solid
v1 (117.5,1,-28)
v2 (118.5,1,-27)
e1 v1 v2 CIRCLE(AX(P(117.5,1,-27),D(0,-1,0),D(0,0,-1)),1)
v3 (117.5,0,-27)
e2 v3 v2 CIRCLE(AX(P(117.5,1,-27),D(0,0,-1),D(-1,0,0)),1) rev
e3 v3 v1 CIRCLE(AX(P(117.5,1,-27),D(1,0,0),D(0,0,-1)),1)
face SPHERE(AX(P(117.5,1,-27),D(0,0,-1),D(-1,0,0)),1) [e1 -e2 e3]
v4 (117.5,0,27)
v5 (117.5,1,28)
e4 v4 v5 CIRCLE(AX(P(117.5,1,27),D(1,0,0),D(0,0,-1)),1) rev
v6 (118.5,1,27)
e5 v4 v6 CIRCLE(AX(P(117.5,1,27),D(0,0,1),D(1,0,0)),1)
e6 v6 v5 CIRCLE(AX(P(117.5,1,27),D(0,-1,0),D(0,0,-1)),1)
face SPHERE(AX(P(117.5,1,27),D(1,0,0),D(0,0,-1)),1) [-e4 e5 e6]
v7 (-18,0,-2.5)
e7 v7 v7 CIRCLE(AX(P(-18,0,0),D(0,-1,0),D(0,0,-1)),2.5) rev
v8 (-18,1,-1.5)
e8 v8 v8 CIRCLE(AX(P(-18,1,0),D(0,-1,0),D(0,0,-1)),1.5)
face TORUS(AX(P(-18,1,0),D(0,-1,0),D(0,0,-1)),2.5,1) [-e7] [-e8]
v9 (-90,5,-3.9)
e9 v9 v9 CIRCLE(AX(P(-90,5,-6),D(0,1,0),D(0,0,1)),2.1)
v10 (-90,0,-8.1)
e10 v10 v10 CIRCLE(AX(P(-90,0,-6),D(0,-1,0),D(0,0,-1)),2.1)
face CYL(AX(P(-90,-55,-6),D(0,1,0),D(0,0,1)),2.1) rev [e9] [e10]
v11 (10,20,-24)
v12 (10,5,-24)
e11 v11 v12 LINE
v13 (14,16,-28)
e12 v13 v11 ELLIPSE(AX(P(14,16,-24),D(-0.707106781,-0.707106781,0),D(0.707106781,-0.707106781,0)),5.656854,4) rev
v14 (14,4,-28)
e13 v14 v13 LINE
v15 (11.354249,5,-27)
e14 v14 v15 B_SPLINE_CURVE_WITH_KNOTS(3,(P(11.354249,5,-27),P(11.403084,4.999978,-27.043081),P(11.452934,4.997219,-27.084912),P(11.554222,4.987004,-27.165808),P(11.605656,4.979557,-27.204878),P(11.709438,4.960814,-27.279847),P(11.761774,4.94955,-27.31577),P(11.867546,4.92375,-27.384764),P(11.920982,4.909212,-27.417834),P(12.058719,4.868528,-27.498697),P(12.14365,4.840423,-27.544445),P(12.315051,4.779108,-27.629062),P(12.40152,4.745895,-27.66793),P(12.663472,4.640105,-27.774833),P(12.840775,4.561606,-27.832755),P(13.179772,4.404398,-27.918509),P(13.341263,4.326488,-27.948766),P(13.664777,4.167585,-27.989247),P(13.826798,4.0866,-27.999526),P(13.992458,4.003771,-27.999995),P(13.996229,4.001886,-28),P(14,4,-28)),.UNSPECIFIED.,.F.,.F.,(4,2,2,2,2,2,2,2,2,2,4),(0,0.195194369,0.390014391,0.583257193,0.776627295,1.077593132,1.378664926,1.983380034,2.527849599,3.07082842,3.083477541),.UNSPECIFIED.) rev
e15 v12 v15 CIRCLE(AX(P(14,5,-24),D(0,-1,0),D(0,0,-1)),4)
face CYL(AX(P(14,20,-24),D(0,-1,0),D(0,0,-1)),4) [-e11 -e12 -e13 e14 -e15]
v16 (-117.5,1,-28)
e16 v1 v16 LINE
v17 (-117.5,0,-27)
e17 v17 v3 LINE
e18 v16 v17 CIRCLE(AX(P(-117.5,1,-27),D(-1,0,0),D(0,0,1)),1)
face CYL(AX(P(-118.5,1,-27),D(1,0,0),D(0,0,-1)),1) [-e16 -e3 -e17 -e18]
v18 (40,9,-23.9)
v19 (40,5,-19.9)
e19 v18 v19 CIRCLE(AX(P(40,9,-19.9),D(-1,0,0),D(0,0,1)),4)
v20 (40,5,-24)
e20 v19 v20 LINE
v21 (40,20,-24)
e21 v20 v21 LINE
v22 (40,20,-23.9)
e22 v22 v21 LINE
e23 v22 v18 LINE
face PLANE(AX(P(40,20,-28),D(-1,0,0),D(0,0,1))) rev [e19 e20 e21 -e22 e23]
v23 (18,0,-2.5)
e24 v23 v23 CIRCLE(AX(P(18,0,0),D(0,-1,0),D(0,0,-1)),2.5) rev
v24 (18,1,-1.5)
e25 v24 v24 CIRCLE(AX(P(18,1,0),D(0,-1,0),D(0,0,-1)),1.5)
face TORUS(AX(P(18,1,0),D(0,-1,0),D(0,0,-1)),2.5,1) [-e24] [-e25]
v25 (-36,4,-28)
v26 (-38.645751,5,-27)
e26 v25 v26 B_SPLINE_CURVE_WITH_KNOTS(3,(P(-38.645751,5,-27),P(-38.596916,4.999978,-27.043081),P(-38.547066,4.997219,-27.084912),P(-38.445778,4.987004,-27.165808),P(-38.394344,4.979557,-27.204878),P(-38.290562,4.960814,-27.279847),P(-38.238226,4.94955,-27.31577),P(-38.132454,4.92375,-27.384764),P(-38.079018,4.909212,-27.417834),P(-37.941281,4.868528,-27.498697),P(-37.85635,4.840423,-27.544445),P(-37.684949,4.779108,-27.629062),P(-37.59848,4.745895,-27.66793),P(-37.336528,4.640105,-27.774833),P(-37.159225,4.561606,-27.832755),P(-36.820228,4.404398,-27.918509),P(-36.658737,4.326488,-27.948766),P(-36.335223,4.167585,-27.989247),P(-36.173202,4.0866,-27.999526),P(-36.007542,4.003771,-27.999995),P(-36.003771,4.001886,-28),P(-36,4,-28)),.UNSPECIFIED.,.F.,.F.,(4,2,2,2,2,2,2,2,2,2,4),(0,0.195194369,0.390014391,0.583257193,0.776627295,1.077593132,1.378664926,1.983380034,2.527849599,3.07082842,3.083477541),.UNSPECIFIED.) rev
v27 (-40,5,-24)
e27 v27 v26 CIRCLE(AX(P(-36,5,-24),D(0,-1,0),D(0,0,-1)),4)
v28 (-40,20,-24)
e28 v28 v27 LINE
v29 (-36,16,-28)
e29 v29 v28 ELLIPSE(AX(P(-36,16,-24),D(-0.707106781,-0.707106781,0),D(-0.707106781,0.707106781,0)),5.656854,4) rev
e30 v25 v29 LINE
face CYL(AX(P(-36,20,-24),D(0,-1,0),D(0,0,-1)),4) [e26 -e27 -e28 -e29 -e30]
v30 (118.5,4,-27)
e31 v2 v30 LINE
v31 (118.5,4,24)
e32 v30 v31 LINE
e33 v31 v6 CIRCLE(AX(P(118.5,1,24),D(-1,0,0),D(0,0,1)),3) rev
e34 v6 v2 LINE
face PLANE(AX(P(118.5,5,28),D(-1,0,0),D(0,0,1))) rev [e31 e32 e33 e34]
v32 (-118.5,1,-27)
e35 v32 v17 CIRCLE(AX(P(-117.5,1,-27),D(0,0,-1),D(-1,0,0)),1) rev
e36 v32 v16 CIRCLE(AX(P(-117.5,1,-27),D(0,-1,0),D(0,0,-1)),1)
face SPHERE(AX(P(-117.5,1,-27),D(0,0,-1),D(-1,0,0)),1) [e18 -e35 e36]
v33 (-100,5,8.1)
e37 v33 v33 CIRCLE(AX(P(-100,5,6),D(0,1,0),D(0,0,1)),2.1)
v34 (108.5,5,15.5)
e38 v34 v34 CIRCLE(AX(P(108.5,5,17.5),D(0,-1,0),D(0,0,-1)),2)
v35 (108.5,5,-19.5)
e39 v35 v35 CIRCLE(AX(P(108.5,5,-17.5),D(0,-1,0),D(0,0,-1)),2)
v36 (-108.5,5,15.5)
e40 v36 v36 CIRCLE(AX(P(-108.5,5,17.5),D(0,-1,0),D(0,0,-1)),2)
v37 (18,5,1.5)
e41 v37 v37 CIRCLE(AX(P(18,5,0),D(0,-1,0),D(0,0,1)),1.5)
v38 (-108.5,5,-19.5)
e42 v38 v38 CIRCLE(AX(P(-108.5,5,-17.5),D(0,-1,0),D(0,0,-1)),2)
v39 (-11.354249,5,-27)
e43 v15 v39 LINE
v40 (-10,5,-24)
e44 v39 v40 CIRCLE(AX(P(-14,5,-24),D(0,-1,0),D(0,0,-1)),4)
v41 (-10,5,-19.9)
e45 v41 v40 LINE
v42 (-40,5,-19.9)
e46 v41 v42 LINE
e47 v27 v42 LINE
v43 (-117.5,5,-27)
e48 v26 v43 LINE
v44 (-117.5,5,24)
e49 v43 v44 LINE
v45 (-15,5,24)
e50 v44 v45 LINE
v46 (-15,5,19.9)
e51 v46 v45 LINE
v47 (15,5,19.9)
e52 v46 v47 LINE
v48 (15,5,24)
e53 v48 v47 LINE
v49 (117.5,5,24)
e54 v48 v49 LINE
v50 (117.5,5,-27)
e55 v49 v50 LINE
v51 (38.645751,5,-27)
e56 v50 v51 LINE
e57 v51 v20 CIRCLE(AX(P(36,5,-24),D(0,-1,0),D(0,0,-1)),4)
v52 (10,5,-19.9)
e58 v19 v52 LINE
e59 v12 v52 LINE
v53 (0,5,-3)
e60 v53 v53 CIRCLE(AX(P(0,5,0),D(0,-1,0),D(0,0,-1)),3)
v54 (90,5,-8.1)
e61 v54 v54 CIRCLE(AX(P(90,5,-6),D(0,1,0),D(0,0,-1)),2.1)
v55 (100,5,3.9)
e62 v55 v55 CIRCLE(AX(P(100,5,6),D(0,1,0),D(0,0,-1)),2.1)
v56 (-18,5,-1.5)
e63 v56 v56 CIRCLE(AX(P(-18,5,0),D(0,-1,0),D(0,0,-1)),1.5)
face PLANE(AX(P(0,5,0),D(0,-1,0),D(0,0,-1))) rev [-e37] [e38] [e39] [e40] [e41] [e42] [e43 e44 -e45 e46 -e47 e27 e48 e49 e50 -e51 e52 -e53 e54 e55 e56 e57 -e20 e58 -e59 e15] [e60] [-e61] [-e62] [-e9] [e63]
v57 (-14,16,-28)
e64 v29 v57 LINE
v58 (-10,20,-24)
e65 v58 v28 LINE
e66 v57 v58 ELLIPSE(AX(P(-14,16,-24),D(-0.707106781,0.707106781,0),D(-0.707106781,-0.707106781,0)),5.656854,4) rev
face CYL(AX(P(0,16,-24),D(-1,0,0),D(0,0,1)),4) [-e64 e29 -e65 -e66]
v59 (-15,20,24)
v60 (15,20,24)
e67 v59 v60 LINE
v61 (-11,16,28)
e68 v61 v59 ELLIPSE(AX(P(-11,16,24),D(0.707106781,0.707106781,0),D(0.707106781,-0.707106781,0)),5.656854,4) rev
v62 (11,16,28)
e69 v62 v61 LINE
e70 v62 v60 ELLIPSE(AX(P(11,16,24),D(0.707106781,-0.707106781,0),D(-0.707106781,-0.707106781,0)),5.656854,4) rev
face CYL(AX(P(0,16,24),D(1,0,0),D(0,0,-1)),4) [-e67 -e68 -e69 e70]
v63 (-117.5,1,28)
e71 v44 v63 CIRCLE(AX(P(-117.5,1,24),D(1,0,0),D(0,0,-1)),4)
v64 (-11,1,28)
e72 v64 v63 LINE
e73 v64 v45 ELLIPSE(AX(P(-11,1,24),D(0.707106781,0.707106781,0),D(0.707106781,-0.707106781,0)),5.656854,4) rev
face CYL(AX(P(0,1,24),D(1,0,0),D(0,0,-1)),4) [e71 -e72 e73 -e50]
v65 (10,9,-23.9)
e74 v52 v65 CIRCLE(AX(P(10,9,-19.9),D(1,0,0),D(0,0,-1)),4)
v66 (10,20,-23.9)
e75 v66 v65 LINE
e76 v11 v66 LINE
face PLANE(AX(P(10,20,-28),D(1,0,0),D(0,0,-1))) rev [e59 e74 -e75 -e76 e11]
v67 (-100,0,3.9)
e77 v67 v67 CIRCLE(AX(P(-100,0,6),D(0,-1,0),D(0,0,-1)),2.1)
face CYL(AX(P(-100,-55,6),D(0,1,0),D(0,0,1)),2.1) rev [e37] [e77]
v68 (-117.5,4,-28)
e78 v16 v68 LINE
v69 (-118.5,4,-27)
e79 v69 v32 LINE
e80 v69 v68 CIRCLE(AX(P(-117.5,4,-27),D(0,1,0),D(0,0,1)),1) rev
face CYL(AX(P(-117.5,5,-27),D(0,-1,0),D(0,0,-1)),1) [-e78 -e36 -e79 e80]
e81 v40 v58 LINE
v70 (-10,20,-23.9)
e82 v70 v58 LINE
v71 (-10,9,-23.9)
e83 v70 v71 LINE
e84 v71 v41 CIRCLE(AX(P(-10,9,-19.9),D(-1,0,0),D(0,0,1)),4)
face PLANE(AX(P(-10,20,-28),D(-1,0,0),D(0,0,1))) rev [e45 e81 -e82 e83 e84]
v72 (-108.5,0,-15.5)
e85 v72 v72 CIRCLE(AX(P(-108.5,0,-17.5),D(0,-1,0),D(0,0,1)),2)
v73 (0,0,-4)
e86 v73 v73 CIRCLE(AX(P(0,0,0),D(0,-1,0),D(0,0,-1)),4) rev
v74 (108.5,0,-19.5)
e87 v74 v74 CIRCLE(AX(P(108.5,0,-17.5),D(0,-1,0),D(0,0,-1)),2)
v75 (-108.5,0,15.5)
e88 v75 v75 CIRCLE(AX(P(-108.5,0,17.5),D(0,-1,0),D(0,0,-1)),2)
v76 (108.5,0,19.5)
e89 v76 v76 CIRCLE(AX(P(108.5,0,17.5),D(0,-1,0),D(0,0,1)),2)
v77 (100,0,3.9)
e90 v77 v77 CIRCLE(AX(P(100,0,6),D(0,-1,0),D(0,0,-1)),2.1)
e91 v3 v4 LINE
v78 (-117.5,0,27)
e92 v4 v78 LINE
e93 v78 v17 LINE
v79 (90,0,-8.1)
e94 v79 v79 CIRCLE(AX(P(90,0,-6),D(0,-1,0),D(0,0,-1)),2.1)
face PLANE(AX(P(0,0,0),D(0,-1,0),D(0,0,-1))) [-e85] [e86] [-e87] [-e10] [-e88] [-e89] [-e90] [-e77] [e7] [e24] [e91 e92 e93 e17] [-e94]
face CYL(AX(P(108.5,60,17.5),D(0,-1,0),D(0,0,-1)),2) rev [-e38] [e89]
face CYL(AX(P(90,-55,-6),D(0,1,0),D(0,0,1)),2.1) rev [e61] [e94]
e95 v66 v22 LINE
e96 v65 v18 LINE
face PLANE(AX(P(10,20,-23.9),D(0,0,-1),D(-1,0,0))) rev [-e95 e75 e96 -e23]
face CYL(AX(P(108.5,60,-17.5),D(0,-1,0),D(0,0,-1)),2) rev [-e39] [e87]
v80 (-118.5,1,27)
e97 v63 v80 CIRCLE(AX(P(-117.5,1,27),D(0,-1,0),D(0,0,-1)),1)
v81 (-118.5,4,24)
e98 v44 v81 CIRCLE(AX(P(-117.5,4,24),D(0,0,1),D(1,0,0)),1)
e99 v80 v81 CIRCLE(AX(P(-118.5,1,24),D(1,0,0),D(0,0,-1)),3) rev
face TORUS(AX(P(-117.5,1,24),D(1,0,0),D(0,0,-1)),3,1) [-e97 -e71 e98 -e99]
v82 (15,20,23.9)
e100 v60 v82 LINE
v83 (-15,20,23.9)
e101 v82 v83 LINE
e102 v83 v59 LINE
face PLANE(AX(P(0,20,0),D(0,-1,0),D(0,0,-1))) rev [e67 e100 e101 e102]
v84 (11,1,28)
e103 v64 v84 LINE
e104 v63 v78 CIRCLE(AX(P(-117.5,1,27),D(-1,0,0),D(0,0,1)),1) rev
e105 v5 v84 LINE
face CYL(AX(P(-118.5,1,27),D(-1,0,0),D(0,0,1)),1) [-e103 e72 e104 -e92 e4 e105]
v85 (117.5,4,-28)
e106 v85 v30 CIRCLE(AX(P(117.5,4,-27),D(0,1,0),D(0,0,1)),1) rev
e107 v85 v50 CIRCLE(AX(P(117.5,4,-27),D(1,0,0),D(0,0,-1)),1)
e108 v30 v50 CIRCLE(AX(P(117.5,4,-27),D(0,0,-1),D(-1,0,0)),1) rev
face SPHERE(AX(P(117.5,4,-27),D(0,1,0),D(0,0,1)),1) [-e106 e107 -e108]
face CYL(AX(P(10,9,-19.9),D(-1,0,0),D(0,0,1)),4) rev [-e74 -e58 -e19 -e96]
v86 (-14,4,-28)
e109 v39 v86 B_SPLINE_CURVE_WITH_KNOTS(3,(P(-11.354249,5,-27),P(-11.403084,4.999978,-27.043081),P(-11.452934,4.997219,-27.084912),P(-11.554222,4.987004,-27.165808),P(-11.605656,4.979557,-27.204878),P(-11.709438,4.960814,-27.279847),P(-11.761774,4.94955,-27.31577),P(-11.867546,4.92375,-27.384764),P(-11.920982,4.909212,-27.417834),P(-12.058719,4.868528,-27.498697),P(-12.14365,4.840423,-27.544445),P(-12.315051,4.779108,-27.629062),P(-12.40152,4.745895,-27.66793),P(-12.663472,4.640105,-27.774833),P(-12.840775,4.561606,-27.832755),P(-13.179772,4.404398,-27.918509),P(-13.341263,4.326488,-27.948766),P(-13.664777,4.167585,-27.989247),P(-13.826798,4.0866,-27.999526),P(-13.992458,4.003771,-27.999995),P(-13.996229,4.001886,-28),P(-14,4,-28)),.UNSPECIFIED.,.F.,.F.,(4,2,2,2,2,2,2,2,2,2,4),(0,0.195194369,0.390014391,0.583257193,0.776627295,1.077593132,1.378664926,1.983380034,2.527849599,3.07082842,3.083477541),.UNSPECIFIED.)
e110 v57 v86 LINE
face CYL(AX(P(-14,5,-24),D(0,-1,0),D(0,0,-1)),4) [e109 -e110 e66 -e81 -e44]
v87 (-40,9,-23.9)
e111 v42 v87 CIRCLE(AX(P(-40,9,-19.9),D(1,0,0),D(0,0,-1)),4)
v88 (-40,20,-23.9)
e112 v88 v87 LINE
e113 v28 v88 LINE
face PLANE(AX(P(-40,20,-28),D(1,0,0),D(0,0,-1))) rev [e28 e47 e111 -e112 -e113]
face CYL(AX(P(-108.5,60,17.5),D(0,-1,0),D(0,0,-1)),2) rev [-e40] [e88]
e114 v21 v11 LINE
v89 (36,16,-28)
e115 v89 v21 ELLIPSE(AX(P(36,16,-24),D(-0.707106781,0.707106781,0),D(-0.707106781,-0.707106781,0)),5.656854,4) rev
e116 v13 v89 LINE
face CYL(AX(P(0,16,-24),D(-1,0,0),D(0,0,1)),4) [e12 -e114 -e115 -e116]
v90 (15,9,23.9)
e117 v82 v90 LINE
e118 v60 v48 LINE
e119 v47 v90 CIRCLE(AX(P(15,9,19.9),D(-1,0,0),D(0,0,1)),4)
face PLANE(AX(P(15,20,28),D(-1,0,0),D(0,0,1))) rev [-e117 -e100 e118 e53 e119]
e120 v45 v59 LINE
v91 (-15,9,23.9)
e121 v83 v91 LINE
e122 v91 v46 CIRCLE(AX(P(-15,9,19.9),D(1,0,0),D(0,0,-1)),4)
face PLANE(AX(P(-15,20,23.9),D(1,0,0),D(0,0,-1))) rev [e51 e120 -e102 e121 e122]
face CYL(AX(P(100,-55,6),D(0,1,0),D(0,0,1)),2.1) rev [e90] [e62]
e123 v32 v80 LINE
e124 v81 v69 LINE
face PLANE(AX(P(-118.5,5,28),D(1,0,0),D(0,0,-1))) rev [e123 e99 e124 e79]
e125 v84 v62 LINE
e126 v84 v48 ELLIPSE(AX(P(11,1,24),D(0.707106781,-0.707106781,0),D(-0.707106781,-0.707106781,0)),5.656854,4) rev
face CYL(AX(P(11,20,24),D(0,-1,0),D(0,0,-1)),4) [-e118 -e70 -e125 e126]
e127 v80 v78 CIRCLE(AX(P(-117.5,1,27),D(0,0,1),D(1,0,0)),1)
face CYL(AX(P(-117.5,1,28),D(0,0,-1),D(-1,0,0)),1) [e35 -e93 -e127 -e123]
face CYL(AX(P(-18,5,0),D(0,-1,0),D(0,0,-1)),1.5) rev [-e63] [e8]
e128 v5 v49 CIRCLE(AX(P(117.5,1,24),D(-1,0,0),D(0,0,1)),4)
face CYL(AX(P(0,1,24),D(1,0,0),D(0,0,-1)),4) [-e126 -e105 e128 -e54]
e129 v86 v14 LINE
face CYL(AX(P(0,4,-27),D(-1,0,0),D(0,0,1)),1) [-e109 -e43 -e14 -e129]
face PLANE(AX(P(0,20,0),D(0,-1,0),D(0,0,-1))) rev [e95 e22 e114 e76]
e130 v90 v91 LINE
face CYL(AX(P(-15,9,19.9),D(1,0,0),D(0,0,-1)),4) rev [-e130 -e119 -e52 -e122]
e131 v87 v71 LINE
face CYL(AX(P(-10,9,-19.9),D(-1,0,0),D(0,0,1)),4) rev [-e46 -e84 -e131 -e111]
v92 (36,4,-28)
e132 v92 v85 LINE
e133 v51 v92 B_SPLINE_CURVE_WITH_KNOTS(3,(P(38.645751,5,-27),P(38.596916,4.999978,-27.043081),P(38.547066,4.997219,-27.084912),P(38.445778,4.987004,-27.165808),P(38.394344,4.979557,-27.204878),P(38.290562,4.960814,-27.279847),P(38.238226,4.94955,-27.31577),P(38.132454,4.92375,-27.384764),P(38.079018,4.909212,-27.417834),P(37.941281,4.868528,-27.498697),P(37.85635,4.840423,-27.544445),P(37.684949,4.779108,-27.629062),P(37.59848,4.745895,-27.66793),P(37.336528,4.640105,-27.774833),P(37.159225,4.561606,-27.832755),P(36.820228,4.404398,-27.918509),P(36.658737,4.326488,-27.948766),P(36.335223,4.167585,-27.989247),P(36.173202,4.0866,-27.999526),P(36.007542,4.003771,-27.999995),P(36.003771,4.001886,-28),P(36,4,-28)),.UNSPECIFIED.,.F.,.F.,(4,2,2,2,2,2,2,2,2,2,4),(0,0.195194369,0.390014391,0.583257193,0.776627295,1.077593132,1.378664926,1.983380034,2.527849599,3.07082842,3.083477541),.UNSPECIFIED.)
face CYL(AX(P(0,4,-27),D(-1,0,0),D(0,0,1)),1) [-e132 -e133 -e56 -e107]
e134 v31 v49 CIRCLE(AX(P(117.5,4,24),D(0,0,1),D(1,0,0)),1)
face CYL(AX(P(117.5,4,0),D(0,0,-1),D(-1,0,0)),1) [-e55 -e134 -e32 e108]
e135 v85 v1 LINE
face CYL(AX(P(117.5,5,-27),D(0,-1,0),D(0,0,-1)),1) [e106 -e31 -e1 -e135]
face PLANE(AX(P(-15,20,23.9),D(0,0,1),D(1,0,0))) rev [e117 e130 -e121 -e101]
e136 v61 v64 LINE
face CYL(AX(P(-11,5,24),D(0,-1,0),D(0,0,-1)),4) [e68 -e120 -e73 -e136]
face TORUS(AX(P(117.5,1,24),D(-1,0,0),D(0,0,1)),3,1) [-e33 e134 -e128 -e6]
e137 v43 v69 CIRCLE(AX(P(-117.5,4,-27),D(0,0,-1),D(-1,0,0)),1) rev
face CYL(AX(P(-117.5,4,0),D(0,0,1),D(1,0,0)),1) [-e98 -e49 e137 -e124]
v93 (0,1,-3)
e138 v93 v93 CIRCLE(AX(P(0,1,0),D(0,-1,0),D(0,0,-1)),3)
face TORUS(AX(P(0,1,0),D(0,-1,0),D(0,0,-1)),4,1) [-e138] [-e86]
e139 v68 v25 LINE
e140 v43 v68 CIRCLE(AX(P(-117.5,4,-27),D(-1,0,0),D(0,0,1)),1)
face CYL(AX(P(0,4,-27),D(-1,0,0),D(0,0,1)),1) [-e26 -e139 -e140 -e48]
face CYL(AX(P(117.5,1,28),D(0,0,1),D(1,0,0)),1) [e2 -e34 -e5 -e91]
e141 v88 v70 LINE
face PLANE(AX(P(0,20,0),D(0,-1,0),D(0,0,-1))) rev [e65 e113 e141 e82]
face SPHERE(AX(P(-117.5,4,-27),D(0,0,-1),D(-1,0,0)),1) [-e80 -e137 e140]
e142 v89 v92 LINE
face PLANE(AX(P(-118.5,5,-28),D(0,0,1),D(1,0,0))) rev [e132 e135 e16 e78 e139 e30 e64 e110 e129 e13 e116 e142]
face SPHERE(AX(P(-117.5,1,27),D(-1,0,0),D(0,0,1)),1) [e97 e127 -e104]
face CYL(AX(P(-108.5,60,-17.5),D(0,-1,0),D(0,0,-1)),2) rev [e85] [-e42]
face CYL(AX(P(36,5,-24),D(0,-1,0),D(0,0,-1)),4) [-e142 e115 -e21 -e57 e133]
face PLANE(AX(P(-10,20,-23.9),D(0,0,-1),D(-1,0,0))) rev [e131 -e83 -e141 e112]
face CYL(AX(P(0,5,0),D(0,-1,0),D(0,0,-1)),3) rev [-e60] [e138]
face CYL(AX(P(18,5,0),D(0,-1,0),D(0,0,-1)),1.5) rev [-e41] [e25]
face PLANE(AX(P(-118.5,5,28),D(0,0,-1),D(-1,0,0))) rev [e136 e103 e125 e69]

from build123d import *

# Parameters (mm, degrees)
SKETCH1_W           = 237
SKETCH1_H           = 56
BOSS_EXTRUDE1_DEPTH = 5
SKETCH2_R           = 1.5
SKETCH2_R_2         = 3
CUT_EXTRUDE1_DEPTH  = 5
SKETCH5_W           = 30
SKETCH5_H           = 4.1
BOSS_EXTRUDE2_DEPTH = 15
FILLET1_R           = 4
FILLET3_R           = 4
FILLET8_R           = 1
SKETCH14_R          = 2
CUT_EXTRUDE6_DEPTH  = 60
SKETCH15_R          = 2.1
CUT_EXTRUDE7_DEPTH  = 60


with BuildPart() as part:
    # Sketch1 → Boss-Extrude1 (new body)
    with BuildSketch(Plane(origin=(0, 0, 0), x_dir=(1, 0, 0), z_dir=(0, 1, 0))):
        Rectangle(SKETCH1_W, SKETCH1_H)
    extrude(amount=BOSS_EXTRUDE1_DEPTH)

    # Sketch2 → Cut-Extrude1 (cut)
    with BuildSketch(Plane.XZ):
        with Locations(Location((-18, 0, 0), (0, 0, 270))):
            Circle(SKETCH2_R)
        with Locations(Location((18, 0, 0), (0, 0, 90))):
            Circle(SKETCH2_R)
        with Locations(Location((0, 0, 0), (0, 0, 270))):
            Circle(SKETCH2_R_2)
    extrude(amount=-CUT_EXTRUDE1_DEPTH, mode=Mode.SUBTRACT)

    # Sketch5 → Boss-Extrude2 (add)
    with BuildSketch(Plane(origin=(0, 5, 0), x_dir=(1, 0, 0), z_dir=(0, 1, 0))):
        with Locations((0, -25.95)):
            Rectangle(SKETCH5_W, SKETCH5_H)
        with Locations((25, 25.95)):
            Rectangle(SKETCH5_W, SKETCH5_H)
        with Locations((-25, 25.95)):
            Rectangle(SKETCH5_W, SKETCH5_H)
    extrude(amount=BOSS_EXTRUDE2_DEPTH)

    # Fillet1
    fillet1_edges = [part.edges().sort_by_distance(p)[0] for p in [
        (-66.75, 5, 28),
        (66.75, 5, 28),
        (15, 12.5, 28),
        (-15, 12.5, 28),
        (0, 20, 28),
        (40, 12.5, -28),
        (10, 12.5, -28),
        (25, 20, -28),
        (-10, 12.5, -28),
        (-40, 12.5, -28),
        (-25, 20, -28),
    ]]
    fillet(fillet1_edges, radius=FILLET1_R)

    # Fillet3
    fillet3_edges = [part.edges().sort_by_distance(p)[0] for p in [
        (0, 5, 23.9),
        (25, 5, -23.9),
        (-25, 5, -23.9),
    ]]
    fillet(fillet3_edges, radius=FILLET3_R)

    # Fillet8
    fillet8_edges = [part.edges().sort_by_distance(p)[0] for p in [
        (0, 0, 28),
        (-18, 0, 1.5),
        (18, 0, -1.5),
        (0, 0, 3),
        (118.5, 0, 0),
        (118.5, 3.828427125, 26.828427125),
        (118.5, 5, -2),
        (0, 5, -28),
        (-77.25, 5, -28),
        (0, 0, -28),
        (118.5, 2.5, -28),
        (77.25, 5, -28),
        (-118.5, 0, 0),
        (-118.5, 2.5, -28),
        (-118.5, 5, -2),
        (-118.5, 3.828427125, 26.828427125),
    ]]
    fillet(fillet8_edges, radius=FILLET8_R - 0.0001)  # a hair under: the kernel refuses the full size

    # Sketch14 → Cut-Extrude6 (cut)
    with BuildSketch(Plane.XZ):
        with Locations(Location((-108.5, 17.5, 0), (0, 0, 270))):
            Circle(SKETCH14_R)
        with Locations(Location((-108.5, -17.5, 0), (0, 0, 270))):
            Circle(SKETCH14_R)
        with Locations(Location((108.5, -17.5, 0), (0, 0, 270))):
            Circle(SKETCH14_R)
        with Locations(Location((108.5, 17.5, 0), (0, 0, 270))):
            Circle(SKETCH14_R)
    extrude(amount=-CUT_EXTRUDE6_DEPTH, mode=Mode.SUBTRACT)

    # Sketch15 → Cut-Extrude7 (cut)
    with BuildSketch(Plane(origin=(0, 5, 0), x_dir=(1, 0, 0), z_dir=(0, 1, 0))):
        with Locations(Location((-90, 6, 0), (0, 0, 270))):
            Circle(SKETCH15_R)
        with Locations(Location((-100, -6, 0), (0, 0, 270))):
            Circle(SKETCH15_R)
        with Locations(Location((100, -6, 0), (0, 0, 90))):
            Circle(SKETCH15_R)
        with Locations(Location((90, 6, 0), (0, 0, 90))):
            Circle(SKETCH15_R)
    extrude(amount=-CUT_EXTRUDE7_DEPTH, mode=Mode.SUBTRACT)


solid = part.part
